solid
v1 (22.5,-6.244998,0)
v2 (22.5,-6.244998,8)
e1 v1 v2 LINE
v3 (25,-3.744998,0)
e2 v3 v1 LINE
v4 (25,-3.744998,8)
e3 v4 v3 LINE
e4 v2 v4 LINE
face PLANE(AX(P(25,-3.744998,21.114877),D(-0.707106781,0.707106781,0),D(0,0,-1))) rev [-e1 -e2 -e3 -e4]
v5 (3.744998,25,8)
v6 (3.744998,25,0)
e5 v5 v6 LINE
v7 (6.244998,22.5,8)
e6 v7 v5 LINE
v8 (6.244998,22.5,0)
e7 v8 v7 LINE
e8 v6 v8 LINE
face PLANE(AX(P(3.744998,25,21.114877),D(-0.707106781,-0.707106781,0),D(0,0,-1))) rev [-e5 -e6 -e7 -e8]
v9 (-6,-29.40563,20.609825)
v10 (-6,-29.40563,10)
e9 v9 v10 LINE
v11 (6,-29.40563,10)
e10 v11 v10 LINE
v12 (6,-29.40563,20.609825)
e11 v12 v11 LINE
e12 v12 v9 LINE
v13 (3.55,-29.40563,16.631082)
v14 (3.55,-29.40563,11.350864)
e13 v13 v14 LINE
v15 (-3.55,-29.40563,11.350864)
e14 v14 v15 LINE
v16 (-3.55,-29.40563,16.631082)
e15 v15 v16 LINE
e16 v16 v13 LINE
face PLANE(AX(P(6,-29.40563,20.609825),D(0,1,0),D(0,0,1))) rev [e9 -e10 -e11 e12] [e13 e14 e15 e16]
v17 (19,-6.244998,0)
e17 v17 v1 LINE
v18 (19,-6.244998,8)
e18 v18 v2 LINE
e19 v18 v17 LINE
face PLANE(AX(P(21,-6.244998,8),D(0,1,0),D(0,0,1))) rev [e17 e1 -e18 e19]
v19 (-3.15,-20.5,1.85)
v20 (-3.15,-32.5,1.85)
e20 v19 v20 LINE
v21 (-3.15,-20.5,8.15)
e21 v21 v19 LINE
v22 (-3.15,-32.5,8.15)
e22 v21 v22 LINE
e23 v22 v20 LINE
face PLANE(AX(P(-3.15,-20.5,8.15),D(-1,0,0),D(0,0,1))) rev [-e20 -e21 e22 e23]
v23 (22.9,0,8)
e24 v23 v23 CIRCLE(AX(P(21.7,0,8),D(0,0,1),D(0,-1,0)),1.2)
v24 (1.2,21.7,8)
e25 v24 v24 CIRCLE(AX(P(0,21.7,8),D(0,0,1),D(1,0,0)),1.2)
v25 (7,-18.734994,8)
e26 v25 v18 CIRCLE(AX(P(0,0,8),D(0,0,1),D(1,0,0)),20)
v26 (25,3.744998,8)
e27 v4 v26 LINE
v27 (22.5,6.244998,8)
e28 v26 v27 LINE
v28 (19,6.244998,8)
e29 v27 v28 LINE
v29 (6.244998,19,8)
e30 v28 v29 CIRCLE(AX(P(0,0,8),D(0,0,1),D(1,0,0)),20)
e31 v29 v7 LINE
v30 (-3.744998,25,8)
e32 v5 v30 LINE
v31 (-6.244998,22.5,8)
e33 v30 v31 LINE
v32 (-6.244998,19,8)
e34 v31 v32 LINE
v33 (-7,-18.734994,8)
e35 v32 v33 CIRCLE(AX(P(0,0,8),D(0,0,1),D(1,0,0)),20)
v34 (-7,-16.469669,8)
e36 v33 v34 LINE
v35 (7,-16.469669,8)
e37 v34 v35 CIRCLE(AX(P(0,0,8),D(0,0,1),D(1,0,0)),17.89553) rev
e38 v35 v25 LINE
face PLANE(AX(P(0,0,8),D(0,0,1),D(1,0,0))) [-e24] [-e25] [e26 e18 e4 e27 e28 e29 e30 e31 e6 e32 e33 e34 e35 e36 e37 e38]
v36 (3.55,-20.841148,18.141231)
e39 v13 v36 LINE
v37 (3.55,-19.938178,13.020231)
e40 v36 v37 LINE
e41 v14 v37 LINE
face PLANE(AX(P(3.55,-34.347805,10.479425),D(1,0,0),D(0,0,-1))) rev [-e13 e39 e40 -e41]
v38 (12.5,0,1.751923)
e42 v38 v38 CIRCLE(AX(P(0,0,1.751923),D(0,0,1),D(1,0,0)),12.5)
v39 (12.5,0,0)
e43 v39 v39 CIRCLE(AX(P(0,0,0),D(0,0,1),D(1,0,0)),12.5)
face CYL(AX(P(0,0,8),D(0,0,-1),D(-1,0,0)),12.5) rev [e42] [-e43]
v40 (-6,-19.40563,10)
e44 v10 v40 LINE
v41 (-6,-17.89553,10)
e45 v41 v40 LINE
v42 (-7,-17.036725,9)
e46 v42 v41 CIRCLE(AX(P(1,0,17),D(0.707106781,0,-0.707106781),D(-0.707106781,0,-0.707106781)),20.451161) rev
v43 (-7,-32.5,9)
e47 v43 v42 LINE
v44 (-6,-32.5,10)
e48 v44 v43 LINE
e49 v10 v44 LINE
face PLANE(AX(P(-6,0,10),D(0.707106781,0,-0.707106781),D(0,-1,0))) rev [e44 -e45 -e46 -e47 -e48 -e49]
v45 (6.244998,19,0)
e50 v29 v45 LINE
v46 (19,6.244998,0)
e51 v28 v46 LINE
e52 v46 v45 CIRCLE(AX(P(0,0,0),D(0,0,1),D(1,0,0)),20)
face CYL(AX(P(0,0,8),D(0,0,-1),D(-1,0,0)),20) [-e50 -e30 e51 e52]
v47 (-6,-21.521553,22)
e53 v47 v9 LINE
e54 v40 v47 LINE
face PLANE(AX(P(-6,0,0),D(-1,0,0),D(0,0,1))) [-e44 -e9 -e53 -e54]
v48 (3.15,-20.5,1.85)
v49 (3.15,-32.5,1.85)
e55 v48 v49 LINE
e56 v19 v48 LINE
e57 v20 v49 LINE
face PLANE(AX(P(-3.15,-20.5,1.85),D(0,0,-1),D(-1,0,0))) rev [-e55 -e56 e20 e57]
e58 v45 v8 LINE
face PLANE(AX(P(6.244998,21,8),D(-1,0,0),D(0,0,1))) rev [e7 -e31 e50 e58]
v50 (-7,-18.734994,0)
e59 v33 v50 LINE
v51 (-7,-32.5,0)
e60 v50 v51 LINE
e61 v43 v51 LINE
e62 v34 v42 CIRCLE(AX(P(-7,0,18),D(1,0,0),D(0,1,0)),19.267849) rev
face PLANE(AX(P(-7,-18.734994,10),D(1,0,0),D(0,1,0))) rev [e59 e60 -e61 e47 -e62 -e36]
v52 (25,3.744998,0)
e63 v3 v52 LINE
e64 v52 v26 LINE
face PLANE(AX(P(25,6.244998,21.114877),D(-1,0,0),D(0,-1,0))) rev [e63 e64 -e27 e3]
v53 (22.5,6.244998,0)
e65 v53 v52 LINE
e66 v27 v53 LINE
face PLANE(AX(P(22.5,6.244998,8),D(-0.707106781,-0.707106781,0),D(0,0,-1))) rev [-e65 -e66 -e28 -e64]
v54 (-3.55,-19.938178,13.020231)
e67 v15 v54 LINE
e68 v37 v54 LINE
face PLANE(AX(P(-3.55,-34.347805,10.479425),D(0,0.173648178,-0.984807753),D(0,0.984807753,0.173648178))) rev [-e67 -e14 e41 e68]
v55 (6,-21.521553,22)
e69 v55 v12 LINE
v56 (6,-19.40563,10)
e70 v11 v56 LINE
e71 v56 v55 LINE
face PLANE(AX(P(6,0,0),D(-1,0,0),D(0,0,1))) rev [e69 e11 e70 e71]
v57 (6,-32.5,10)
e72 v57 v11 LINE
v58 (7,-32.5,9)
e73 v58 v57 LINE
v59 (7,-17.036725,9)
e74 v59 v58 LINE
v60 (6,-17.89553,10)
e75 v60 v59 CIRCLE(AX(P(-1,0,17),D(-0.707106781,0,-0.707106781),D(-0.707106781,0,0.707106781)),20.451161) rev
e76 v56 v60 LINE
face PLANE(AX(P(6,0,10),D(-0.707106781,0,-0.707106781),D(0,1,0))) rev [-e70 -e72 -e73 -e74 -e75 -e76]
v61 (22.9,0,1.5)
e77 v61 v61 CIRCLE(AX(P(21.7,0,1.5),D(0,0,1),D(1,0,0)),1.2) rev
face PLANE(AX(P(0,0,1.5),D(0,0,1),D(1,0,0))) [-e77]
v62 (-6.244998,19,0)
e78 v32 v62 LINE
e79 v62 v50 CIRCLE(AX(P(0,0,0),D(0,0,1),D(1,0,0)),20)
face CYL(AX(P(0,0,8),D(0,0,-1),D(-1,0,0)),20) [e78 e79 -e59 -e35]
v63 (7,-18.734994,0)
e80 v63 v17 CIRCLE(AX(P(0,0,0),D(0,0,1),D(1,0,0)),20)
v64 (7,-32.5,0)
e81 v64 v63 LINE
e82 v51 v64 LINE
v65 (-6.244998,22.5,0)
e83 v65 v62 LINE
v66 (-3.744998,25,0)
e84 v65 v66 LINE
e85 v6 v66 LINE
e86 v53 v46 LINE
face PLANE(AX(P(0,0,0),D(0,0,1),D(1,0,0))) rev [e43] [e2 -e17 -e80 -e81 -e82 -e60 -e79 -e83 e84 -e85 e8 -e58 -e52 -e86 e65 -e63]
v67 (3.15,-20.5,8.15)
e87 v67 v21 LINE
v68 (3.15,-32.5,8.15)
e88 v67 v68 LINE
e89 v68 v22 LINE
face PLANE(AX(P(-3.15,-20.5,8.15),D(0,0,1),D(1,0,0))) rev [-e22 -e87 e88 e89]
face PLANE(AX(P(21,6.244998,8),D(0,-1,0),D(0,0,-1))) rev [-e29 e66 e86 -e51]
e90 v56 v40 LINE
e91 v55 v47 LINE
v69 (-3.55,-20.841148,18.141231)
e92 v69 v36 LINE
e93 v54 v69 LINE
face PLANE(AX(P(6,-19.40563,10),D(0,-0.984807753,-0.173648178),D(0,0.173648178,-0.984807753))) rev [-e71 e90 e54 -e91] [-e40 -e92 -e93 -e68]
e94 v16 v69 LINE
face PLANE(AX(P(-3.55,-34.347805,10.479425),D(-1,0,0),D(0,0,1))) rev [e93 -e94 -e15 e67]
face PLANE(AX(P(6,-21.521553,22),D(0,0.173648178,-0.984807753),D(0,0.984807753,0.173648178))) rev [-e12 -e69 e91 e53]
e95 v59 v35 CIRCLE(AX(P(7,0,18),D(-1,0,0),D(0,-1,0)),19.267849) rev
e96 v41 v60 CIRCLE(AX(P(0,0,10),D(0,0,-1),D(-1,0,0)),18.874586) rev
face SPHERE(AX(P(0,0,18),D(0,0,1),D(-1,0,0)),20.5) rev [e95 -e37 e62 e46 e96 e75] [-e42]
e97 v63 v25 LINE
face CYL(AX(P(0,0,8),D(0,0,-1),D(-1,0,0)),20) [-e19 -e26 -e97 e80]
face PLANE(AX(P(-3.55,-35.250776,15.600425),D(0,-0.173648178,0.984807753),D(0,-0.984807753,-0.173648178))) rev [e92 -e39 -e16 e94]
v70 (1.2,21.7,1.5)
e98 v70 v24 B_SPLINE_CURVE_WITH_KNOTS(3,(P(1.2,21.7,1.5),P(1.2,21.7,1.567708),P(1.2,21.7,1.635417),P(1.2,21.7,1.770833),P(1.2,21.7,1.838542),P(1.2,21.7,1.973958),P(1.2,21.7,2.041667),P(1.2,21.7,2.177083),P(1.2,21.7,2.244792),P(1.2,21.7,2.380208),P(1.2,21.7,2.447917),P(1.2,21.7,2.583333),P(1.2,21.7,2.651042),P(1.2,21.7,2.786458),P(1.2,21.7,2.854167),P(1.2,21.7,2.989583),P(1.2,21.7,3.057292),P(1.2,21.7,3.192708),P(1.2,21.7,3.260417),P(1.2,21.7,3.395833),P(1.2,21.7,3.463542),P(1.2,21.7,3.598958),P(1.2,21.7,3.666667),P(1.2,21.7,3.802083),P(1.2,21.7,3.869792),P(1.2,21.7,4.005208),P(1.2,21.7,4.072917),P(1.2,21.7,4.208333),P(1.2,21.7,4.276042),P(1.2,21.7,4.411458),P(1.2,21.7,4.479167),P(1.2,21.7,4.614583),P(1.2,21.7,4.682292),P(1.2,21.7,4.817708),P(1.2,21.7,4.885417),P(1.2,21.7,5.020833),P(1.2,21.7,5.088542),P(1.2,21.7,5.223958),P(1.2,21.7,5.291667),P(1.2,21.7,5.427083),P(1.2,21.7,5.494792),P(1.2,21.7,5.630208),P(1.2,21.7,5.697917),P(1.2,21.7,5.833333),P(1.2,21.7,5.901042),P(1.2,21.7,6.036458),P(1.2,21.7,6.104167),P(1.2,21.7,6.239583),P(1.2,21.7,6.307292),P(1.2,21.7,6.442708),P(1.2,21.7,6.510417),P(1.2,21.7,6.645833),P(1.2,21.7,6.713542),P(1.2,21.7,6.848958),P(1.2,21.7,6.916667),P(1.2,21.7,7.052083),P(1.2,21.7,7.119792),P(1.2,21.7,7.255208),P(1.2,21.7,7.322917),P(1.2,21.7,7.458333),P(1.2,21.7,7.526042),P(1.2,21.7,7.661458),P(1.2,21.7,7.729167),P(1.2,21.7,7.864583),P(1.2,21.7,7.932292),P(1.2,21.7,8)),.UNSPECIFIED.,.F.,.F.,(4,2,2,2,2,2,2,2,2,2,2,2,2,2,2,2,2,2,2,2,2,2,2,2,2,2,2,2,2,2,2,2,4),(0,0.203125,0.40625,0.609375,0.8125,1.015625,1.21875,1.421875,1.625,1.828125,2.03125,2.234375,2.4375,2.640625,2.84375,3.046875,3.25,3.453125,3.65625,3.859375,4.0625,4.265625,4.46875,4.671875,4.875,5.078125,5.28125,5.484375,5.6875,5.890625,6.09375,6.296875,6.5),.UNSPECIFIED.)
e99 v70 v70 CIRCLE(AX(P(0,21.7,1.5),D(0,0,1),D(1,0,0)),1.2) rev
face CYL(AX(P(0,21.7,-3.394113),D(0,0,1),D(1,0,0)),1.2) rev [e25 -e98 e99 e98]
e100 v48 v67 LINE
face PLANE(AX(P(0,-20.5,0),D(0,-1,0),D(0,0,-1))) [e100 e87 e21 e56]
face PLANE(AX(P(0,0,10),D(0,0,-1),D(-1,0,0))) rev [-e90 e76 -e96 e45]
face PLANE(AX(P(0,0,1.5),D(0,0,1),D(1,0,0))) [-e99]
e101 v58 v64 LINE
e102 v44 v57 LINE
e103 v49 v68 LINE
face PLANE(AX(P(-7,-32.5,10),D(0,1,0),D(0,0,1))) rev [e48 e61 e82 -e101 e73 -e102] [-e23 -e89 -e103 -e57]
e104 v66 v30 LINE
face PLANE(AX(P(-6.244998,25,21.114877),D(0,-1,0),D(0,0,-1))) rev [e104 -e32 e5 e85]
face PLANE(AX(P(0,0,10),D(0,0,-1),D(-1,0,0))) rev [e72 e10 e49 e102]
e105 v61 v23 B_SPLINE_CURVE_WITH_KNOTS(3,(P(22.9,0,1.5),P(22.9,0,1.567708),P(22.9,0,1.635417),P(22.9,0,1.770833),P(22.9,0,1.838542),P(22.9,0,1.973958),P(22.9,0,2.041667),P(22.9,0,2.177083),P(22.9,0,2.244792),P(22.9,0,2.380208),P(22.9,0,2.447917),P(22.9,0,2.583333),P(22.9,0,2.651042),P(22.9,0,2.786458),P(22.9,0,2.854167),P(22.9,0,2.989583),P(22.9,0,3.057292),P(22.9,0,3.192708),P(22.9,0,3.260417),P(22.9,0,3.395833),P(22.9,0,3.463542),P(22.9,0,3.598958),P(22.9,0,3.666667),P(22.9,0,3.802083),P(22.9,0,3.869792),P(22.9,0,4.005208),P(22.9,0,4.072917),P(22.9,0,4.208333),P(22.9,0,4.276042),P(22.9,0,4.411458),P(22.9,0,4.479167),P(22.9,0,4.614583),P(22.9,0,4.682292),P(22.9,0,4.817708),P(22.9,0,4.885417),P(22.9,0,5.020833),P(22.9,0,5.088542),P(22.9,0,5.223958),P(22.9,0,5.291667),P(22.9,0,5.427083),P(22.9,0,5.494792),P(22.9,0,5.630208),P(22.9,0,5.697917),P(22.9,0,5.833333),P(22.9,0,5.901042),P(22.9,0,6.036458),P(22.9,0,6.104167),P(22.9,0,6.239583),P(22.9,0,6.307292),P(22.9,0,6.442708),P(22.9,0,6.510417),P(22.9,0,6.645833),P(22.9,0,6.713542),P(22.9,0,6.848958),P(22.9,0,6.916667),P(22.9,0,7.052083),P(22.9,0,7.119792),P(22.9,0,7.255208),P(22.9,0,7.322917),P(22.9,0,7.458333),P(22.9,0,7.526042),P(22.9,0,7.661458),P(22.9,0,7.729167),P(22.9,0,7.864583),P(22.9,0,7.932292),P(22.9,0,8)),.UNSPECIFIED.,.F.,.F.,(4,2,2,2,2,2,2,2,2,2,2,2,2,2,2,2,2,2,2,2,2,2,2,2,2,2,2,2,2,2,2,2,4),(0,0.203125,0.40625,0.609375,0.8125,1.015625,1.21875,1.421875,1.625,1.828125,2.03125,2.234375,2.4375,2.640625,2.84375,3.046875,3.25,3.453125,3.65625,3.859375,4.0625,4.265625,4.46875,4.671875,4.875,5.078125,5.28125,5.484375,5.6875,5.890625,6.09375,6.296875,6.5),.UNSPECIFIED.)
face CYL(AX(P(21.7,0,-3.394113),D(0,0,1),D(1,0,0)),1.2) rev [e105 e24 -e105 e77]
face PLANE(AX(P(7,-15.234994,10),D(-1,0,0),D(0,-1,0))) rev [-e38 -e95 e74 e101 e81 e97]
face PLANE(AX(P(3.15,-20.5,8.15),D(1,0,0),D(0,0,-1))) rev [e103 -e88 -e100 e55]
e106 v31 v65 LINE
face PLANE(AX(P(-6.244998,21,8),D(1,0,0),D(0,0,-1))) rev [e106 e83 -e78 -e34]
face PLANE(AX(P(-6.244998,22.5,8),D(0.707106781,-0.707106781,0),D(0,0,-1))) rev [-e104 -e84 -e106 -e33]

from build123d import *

# Parameters (mm, degrees)
SKETCH1_R            = 12.5
BOSS_EXTRUDE1_DEPTH  = 8
BOSS_EXTRUDE2_DEPTH  = 10
SKETCH4_W            = 6.3
SKETCH4_H            = 6.3
CUT_EXTRUDE1_DEPTH   = 12
BOSS_EXTRUDE4_DEPTH  = 6
SKETCH13_W           = 7.1
SKETCH13_H           = 5.2
CUT_EXTRUDE5_DEPTH   = 51.192153127
SKETCH22_W           = 12.489995996
SKETCH22_H           = 4
BOSS_EXTRUDE10_DEPTH = 8
SKETCH24_R           = 1.2
CUT_EXTRUDE8_DEPTH   = 6.5
CIRPATTERN1_COUNT    = 2
CIRPATTERN1_ANGLE    = 90
CHAMFER1_SIZE        = 2.5
CHAMFER2_SIZE        = 1


with BuildPart() as part:
    # Sketch1 → Boss-Extrude1 (new body)
    with BuildSketch(Plane.XY):
        with BuildLine():
            Line((-6.244997998, 21), (6.244997998, 21))
            Line((6.244997998, 21), (6.244997998, 19))
            ThreePointArc((6.244997998, 19), (14.142135624, 14.142135624), (19, 6.244997998))
            Line((19, 6.244997998), (21, 6.244997998))
            Line((21, 6.244997998), (21, -6.244997998))
            Line((21, -6.244997998), (19, -6.244997998))
            ThreePointArc((19, -6.244997998), (11.728172066, -16.200308021), (0, -20))
            ThreePointArc((0, -20), (-19.748417658, -3.16227766), (-6.244997998, 19))
            Line((-6.244997998, 19), (-6.244997998, 21))
        make_face()
        Circle(SKETCH1_R, mode=Mode.SUBTRACT)
    extrude(amount=BOSS_EXTRUDE1_DEPTH)

    # Sketch3 → Boss-Extrude2 (add)
    with BuildSketch(Plane.XY):
        Polygon((-7, -18.734993995), (-7, -32.5), (7, -32.5), (7, -18.734993995), (7, -15.234993995), (-7, -15.234993995), align=None)
    extrude(amount=BOSS_EXTRUDE2_DEPTH)

    # Sketch2 → Cut-Revolve2 (revolve, cut)
    with BuildSketch(Plane(origin=(0, 0, 0), x_dir=(1, 0, 0), z_dir=(0, 1, 0))):
        with BuildLine():
            Line((0, -38.5), (0, 2.5))
            ThreePointArc((0, 2.5), (-20.5, -18), (0, -38.5))
        make_face()
    revolve(axis=Axis((0, 0, 8), (0, 0, -1)), mode=Mode.SUBTRACT)

    # Sketch4 → Cut-Extrude1 (cut)
    with BuildSketch(Plane.XZ.offset(32.5)):
        with Locations((0, 5)):
            Rectangle(SKETCH4_W, SKETCH4_H)
    extrude(amount=-CUT_EXTRUDE1_DEPTH, mode=Mode.SUBTRACT)

    # Sketch11 → Boss-Extrude4 (add, symmetric)
    with BuildSketch(Plane(origin=(0, 0, 0), x_dir=(0, 0, -1), z_dir=(1, 0, 0))):
        Polygon((-10, -19.405629698), (-22, -21.521553466), (-20.609824642, -29.405629698), (-10, -29.405629698), align=None)
    extrude(amount=BOSS_EXTRUDE4_DEPTH, both=True)

    # Sketch13 → Cut-Extrude5 (cut, through all)
    with BuildSketch(Plane(origin=(0, -17.110377647, -3.017021229), x_dir=(1, 0, 0), z_dir=(0, 0.9848077530122074, 0.17364817766693455))):
        with Locations((0, -18.884652651)):
            Rectangle(SKETCH13_W, SKETCH13_H)
    extrude(amount=-CUT_EXTRUDE5_DEPTH, mode=Mode.SUBTRACT)

    # Sketch22 → Boss-Extrude10 (add)
    with BuildSketch(Plane.XY):
        with Locations((0, 23)):
            Rectangle(SKETCH22_W, SKETCH22_H)
    boss_extrude10 = extrude(amount=BOSS_EXTRUDE10_DEPTH)

    # Sketch24 → Cut-Extrude8 (cut)
    with BuildSketch(Plane.XY.offset(8)):
        with Locations((0, 21.7)):
            Circle(SKETCH24_R)
    cut_extrude8 = extrude(amount=-CUT_EXTRUDE8_DEPTH, mode=Mode.SUBTRACT)

    # CirPattern1: Boss-Extrude10, Cut-Extrude8 ×2 about axis
    cirpattern1_axis = Axis((0, 0, 0), (0, 0, -1))
    add([boss_extrude10.rotate(cirpattern1_axis, i * CIRPATTERN1_ANGLE / (CIRPATTERN1_COUNT - 1)) for i in range(1, CIRPATTERN1_COUNT)])
    add([cut_extrude8.rotate(cirpattern1_axis, i * CIRPATTERN1_ANGLE / (CIRPATTERN1_COUNT - 1)) for i in range(1, CIRPATTERN1_COUNT)], mode=Mode.SUBTRACT)

    # Chamfer1
    chamfer1_edges = [part.edges().sort_by_distance(p)[0] for p in [
        (-6.244997998, 25, 4),
        (6.244997998, 25, 4),
        (25, 6.244997998, 4),
        (25, -6.244997998, 4),
    ]]
    chamfer(chamfer1_edges, length=CHAMFER1_SIZE)

    # Chamfer2
    chamfer2_edges = [part.edges().sort_by_distance(p)[0] for p in [
        (7, -25.014274071, 10),
        (-7, -25.014274071, 10),
    ]]
    chamfer(chamfer2_edges, length=CHAMFER2_SIZE - 0.0001)  # a hair under: the kernel refuses the full size


solid = part.part
